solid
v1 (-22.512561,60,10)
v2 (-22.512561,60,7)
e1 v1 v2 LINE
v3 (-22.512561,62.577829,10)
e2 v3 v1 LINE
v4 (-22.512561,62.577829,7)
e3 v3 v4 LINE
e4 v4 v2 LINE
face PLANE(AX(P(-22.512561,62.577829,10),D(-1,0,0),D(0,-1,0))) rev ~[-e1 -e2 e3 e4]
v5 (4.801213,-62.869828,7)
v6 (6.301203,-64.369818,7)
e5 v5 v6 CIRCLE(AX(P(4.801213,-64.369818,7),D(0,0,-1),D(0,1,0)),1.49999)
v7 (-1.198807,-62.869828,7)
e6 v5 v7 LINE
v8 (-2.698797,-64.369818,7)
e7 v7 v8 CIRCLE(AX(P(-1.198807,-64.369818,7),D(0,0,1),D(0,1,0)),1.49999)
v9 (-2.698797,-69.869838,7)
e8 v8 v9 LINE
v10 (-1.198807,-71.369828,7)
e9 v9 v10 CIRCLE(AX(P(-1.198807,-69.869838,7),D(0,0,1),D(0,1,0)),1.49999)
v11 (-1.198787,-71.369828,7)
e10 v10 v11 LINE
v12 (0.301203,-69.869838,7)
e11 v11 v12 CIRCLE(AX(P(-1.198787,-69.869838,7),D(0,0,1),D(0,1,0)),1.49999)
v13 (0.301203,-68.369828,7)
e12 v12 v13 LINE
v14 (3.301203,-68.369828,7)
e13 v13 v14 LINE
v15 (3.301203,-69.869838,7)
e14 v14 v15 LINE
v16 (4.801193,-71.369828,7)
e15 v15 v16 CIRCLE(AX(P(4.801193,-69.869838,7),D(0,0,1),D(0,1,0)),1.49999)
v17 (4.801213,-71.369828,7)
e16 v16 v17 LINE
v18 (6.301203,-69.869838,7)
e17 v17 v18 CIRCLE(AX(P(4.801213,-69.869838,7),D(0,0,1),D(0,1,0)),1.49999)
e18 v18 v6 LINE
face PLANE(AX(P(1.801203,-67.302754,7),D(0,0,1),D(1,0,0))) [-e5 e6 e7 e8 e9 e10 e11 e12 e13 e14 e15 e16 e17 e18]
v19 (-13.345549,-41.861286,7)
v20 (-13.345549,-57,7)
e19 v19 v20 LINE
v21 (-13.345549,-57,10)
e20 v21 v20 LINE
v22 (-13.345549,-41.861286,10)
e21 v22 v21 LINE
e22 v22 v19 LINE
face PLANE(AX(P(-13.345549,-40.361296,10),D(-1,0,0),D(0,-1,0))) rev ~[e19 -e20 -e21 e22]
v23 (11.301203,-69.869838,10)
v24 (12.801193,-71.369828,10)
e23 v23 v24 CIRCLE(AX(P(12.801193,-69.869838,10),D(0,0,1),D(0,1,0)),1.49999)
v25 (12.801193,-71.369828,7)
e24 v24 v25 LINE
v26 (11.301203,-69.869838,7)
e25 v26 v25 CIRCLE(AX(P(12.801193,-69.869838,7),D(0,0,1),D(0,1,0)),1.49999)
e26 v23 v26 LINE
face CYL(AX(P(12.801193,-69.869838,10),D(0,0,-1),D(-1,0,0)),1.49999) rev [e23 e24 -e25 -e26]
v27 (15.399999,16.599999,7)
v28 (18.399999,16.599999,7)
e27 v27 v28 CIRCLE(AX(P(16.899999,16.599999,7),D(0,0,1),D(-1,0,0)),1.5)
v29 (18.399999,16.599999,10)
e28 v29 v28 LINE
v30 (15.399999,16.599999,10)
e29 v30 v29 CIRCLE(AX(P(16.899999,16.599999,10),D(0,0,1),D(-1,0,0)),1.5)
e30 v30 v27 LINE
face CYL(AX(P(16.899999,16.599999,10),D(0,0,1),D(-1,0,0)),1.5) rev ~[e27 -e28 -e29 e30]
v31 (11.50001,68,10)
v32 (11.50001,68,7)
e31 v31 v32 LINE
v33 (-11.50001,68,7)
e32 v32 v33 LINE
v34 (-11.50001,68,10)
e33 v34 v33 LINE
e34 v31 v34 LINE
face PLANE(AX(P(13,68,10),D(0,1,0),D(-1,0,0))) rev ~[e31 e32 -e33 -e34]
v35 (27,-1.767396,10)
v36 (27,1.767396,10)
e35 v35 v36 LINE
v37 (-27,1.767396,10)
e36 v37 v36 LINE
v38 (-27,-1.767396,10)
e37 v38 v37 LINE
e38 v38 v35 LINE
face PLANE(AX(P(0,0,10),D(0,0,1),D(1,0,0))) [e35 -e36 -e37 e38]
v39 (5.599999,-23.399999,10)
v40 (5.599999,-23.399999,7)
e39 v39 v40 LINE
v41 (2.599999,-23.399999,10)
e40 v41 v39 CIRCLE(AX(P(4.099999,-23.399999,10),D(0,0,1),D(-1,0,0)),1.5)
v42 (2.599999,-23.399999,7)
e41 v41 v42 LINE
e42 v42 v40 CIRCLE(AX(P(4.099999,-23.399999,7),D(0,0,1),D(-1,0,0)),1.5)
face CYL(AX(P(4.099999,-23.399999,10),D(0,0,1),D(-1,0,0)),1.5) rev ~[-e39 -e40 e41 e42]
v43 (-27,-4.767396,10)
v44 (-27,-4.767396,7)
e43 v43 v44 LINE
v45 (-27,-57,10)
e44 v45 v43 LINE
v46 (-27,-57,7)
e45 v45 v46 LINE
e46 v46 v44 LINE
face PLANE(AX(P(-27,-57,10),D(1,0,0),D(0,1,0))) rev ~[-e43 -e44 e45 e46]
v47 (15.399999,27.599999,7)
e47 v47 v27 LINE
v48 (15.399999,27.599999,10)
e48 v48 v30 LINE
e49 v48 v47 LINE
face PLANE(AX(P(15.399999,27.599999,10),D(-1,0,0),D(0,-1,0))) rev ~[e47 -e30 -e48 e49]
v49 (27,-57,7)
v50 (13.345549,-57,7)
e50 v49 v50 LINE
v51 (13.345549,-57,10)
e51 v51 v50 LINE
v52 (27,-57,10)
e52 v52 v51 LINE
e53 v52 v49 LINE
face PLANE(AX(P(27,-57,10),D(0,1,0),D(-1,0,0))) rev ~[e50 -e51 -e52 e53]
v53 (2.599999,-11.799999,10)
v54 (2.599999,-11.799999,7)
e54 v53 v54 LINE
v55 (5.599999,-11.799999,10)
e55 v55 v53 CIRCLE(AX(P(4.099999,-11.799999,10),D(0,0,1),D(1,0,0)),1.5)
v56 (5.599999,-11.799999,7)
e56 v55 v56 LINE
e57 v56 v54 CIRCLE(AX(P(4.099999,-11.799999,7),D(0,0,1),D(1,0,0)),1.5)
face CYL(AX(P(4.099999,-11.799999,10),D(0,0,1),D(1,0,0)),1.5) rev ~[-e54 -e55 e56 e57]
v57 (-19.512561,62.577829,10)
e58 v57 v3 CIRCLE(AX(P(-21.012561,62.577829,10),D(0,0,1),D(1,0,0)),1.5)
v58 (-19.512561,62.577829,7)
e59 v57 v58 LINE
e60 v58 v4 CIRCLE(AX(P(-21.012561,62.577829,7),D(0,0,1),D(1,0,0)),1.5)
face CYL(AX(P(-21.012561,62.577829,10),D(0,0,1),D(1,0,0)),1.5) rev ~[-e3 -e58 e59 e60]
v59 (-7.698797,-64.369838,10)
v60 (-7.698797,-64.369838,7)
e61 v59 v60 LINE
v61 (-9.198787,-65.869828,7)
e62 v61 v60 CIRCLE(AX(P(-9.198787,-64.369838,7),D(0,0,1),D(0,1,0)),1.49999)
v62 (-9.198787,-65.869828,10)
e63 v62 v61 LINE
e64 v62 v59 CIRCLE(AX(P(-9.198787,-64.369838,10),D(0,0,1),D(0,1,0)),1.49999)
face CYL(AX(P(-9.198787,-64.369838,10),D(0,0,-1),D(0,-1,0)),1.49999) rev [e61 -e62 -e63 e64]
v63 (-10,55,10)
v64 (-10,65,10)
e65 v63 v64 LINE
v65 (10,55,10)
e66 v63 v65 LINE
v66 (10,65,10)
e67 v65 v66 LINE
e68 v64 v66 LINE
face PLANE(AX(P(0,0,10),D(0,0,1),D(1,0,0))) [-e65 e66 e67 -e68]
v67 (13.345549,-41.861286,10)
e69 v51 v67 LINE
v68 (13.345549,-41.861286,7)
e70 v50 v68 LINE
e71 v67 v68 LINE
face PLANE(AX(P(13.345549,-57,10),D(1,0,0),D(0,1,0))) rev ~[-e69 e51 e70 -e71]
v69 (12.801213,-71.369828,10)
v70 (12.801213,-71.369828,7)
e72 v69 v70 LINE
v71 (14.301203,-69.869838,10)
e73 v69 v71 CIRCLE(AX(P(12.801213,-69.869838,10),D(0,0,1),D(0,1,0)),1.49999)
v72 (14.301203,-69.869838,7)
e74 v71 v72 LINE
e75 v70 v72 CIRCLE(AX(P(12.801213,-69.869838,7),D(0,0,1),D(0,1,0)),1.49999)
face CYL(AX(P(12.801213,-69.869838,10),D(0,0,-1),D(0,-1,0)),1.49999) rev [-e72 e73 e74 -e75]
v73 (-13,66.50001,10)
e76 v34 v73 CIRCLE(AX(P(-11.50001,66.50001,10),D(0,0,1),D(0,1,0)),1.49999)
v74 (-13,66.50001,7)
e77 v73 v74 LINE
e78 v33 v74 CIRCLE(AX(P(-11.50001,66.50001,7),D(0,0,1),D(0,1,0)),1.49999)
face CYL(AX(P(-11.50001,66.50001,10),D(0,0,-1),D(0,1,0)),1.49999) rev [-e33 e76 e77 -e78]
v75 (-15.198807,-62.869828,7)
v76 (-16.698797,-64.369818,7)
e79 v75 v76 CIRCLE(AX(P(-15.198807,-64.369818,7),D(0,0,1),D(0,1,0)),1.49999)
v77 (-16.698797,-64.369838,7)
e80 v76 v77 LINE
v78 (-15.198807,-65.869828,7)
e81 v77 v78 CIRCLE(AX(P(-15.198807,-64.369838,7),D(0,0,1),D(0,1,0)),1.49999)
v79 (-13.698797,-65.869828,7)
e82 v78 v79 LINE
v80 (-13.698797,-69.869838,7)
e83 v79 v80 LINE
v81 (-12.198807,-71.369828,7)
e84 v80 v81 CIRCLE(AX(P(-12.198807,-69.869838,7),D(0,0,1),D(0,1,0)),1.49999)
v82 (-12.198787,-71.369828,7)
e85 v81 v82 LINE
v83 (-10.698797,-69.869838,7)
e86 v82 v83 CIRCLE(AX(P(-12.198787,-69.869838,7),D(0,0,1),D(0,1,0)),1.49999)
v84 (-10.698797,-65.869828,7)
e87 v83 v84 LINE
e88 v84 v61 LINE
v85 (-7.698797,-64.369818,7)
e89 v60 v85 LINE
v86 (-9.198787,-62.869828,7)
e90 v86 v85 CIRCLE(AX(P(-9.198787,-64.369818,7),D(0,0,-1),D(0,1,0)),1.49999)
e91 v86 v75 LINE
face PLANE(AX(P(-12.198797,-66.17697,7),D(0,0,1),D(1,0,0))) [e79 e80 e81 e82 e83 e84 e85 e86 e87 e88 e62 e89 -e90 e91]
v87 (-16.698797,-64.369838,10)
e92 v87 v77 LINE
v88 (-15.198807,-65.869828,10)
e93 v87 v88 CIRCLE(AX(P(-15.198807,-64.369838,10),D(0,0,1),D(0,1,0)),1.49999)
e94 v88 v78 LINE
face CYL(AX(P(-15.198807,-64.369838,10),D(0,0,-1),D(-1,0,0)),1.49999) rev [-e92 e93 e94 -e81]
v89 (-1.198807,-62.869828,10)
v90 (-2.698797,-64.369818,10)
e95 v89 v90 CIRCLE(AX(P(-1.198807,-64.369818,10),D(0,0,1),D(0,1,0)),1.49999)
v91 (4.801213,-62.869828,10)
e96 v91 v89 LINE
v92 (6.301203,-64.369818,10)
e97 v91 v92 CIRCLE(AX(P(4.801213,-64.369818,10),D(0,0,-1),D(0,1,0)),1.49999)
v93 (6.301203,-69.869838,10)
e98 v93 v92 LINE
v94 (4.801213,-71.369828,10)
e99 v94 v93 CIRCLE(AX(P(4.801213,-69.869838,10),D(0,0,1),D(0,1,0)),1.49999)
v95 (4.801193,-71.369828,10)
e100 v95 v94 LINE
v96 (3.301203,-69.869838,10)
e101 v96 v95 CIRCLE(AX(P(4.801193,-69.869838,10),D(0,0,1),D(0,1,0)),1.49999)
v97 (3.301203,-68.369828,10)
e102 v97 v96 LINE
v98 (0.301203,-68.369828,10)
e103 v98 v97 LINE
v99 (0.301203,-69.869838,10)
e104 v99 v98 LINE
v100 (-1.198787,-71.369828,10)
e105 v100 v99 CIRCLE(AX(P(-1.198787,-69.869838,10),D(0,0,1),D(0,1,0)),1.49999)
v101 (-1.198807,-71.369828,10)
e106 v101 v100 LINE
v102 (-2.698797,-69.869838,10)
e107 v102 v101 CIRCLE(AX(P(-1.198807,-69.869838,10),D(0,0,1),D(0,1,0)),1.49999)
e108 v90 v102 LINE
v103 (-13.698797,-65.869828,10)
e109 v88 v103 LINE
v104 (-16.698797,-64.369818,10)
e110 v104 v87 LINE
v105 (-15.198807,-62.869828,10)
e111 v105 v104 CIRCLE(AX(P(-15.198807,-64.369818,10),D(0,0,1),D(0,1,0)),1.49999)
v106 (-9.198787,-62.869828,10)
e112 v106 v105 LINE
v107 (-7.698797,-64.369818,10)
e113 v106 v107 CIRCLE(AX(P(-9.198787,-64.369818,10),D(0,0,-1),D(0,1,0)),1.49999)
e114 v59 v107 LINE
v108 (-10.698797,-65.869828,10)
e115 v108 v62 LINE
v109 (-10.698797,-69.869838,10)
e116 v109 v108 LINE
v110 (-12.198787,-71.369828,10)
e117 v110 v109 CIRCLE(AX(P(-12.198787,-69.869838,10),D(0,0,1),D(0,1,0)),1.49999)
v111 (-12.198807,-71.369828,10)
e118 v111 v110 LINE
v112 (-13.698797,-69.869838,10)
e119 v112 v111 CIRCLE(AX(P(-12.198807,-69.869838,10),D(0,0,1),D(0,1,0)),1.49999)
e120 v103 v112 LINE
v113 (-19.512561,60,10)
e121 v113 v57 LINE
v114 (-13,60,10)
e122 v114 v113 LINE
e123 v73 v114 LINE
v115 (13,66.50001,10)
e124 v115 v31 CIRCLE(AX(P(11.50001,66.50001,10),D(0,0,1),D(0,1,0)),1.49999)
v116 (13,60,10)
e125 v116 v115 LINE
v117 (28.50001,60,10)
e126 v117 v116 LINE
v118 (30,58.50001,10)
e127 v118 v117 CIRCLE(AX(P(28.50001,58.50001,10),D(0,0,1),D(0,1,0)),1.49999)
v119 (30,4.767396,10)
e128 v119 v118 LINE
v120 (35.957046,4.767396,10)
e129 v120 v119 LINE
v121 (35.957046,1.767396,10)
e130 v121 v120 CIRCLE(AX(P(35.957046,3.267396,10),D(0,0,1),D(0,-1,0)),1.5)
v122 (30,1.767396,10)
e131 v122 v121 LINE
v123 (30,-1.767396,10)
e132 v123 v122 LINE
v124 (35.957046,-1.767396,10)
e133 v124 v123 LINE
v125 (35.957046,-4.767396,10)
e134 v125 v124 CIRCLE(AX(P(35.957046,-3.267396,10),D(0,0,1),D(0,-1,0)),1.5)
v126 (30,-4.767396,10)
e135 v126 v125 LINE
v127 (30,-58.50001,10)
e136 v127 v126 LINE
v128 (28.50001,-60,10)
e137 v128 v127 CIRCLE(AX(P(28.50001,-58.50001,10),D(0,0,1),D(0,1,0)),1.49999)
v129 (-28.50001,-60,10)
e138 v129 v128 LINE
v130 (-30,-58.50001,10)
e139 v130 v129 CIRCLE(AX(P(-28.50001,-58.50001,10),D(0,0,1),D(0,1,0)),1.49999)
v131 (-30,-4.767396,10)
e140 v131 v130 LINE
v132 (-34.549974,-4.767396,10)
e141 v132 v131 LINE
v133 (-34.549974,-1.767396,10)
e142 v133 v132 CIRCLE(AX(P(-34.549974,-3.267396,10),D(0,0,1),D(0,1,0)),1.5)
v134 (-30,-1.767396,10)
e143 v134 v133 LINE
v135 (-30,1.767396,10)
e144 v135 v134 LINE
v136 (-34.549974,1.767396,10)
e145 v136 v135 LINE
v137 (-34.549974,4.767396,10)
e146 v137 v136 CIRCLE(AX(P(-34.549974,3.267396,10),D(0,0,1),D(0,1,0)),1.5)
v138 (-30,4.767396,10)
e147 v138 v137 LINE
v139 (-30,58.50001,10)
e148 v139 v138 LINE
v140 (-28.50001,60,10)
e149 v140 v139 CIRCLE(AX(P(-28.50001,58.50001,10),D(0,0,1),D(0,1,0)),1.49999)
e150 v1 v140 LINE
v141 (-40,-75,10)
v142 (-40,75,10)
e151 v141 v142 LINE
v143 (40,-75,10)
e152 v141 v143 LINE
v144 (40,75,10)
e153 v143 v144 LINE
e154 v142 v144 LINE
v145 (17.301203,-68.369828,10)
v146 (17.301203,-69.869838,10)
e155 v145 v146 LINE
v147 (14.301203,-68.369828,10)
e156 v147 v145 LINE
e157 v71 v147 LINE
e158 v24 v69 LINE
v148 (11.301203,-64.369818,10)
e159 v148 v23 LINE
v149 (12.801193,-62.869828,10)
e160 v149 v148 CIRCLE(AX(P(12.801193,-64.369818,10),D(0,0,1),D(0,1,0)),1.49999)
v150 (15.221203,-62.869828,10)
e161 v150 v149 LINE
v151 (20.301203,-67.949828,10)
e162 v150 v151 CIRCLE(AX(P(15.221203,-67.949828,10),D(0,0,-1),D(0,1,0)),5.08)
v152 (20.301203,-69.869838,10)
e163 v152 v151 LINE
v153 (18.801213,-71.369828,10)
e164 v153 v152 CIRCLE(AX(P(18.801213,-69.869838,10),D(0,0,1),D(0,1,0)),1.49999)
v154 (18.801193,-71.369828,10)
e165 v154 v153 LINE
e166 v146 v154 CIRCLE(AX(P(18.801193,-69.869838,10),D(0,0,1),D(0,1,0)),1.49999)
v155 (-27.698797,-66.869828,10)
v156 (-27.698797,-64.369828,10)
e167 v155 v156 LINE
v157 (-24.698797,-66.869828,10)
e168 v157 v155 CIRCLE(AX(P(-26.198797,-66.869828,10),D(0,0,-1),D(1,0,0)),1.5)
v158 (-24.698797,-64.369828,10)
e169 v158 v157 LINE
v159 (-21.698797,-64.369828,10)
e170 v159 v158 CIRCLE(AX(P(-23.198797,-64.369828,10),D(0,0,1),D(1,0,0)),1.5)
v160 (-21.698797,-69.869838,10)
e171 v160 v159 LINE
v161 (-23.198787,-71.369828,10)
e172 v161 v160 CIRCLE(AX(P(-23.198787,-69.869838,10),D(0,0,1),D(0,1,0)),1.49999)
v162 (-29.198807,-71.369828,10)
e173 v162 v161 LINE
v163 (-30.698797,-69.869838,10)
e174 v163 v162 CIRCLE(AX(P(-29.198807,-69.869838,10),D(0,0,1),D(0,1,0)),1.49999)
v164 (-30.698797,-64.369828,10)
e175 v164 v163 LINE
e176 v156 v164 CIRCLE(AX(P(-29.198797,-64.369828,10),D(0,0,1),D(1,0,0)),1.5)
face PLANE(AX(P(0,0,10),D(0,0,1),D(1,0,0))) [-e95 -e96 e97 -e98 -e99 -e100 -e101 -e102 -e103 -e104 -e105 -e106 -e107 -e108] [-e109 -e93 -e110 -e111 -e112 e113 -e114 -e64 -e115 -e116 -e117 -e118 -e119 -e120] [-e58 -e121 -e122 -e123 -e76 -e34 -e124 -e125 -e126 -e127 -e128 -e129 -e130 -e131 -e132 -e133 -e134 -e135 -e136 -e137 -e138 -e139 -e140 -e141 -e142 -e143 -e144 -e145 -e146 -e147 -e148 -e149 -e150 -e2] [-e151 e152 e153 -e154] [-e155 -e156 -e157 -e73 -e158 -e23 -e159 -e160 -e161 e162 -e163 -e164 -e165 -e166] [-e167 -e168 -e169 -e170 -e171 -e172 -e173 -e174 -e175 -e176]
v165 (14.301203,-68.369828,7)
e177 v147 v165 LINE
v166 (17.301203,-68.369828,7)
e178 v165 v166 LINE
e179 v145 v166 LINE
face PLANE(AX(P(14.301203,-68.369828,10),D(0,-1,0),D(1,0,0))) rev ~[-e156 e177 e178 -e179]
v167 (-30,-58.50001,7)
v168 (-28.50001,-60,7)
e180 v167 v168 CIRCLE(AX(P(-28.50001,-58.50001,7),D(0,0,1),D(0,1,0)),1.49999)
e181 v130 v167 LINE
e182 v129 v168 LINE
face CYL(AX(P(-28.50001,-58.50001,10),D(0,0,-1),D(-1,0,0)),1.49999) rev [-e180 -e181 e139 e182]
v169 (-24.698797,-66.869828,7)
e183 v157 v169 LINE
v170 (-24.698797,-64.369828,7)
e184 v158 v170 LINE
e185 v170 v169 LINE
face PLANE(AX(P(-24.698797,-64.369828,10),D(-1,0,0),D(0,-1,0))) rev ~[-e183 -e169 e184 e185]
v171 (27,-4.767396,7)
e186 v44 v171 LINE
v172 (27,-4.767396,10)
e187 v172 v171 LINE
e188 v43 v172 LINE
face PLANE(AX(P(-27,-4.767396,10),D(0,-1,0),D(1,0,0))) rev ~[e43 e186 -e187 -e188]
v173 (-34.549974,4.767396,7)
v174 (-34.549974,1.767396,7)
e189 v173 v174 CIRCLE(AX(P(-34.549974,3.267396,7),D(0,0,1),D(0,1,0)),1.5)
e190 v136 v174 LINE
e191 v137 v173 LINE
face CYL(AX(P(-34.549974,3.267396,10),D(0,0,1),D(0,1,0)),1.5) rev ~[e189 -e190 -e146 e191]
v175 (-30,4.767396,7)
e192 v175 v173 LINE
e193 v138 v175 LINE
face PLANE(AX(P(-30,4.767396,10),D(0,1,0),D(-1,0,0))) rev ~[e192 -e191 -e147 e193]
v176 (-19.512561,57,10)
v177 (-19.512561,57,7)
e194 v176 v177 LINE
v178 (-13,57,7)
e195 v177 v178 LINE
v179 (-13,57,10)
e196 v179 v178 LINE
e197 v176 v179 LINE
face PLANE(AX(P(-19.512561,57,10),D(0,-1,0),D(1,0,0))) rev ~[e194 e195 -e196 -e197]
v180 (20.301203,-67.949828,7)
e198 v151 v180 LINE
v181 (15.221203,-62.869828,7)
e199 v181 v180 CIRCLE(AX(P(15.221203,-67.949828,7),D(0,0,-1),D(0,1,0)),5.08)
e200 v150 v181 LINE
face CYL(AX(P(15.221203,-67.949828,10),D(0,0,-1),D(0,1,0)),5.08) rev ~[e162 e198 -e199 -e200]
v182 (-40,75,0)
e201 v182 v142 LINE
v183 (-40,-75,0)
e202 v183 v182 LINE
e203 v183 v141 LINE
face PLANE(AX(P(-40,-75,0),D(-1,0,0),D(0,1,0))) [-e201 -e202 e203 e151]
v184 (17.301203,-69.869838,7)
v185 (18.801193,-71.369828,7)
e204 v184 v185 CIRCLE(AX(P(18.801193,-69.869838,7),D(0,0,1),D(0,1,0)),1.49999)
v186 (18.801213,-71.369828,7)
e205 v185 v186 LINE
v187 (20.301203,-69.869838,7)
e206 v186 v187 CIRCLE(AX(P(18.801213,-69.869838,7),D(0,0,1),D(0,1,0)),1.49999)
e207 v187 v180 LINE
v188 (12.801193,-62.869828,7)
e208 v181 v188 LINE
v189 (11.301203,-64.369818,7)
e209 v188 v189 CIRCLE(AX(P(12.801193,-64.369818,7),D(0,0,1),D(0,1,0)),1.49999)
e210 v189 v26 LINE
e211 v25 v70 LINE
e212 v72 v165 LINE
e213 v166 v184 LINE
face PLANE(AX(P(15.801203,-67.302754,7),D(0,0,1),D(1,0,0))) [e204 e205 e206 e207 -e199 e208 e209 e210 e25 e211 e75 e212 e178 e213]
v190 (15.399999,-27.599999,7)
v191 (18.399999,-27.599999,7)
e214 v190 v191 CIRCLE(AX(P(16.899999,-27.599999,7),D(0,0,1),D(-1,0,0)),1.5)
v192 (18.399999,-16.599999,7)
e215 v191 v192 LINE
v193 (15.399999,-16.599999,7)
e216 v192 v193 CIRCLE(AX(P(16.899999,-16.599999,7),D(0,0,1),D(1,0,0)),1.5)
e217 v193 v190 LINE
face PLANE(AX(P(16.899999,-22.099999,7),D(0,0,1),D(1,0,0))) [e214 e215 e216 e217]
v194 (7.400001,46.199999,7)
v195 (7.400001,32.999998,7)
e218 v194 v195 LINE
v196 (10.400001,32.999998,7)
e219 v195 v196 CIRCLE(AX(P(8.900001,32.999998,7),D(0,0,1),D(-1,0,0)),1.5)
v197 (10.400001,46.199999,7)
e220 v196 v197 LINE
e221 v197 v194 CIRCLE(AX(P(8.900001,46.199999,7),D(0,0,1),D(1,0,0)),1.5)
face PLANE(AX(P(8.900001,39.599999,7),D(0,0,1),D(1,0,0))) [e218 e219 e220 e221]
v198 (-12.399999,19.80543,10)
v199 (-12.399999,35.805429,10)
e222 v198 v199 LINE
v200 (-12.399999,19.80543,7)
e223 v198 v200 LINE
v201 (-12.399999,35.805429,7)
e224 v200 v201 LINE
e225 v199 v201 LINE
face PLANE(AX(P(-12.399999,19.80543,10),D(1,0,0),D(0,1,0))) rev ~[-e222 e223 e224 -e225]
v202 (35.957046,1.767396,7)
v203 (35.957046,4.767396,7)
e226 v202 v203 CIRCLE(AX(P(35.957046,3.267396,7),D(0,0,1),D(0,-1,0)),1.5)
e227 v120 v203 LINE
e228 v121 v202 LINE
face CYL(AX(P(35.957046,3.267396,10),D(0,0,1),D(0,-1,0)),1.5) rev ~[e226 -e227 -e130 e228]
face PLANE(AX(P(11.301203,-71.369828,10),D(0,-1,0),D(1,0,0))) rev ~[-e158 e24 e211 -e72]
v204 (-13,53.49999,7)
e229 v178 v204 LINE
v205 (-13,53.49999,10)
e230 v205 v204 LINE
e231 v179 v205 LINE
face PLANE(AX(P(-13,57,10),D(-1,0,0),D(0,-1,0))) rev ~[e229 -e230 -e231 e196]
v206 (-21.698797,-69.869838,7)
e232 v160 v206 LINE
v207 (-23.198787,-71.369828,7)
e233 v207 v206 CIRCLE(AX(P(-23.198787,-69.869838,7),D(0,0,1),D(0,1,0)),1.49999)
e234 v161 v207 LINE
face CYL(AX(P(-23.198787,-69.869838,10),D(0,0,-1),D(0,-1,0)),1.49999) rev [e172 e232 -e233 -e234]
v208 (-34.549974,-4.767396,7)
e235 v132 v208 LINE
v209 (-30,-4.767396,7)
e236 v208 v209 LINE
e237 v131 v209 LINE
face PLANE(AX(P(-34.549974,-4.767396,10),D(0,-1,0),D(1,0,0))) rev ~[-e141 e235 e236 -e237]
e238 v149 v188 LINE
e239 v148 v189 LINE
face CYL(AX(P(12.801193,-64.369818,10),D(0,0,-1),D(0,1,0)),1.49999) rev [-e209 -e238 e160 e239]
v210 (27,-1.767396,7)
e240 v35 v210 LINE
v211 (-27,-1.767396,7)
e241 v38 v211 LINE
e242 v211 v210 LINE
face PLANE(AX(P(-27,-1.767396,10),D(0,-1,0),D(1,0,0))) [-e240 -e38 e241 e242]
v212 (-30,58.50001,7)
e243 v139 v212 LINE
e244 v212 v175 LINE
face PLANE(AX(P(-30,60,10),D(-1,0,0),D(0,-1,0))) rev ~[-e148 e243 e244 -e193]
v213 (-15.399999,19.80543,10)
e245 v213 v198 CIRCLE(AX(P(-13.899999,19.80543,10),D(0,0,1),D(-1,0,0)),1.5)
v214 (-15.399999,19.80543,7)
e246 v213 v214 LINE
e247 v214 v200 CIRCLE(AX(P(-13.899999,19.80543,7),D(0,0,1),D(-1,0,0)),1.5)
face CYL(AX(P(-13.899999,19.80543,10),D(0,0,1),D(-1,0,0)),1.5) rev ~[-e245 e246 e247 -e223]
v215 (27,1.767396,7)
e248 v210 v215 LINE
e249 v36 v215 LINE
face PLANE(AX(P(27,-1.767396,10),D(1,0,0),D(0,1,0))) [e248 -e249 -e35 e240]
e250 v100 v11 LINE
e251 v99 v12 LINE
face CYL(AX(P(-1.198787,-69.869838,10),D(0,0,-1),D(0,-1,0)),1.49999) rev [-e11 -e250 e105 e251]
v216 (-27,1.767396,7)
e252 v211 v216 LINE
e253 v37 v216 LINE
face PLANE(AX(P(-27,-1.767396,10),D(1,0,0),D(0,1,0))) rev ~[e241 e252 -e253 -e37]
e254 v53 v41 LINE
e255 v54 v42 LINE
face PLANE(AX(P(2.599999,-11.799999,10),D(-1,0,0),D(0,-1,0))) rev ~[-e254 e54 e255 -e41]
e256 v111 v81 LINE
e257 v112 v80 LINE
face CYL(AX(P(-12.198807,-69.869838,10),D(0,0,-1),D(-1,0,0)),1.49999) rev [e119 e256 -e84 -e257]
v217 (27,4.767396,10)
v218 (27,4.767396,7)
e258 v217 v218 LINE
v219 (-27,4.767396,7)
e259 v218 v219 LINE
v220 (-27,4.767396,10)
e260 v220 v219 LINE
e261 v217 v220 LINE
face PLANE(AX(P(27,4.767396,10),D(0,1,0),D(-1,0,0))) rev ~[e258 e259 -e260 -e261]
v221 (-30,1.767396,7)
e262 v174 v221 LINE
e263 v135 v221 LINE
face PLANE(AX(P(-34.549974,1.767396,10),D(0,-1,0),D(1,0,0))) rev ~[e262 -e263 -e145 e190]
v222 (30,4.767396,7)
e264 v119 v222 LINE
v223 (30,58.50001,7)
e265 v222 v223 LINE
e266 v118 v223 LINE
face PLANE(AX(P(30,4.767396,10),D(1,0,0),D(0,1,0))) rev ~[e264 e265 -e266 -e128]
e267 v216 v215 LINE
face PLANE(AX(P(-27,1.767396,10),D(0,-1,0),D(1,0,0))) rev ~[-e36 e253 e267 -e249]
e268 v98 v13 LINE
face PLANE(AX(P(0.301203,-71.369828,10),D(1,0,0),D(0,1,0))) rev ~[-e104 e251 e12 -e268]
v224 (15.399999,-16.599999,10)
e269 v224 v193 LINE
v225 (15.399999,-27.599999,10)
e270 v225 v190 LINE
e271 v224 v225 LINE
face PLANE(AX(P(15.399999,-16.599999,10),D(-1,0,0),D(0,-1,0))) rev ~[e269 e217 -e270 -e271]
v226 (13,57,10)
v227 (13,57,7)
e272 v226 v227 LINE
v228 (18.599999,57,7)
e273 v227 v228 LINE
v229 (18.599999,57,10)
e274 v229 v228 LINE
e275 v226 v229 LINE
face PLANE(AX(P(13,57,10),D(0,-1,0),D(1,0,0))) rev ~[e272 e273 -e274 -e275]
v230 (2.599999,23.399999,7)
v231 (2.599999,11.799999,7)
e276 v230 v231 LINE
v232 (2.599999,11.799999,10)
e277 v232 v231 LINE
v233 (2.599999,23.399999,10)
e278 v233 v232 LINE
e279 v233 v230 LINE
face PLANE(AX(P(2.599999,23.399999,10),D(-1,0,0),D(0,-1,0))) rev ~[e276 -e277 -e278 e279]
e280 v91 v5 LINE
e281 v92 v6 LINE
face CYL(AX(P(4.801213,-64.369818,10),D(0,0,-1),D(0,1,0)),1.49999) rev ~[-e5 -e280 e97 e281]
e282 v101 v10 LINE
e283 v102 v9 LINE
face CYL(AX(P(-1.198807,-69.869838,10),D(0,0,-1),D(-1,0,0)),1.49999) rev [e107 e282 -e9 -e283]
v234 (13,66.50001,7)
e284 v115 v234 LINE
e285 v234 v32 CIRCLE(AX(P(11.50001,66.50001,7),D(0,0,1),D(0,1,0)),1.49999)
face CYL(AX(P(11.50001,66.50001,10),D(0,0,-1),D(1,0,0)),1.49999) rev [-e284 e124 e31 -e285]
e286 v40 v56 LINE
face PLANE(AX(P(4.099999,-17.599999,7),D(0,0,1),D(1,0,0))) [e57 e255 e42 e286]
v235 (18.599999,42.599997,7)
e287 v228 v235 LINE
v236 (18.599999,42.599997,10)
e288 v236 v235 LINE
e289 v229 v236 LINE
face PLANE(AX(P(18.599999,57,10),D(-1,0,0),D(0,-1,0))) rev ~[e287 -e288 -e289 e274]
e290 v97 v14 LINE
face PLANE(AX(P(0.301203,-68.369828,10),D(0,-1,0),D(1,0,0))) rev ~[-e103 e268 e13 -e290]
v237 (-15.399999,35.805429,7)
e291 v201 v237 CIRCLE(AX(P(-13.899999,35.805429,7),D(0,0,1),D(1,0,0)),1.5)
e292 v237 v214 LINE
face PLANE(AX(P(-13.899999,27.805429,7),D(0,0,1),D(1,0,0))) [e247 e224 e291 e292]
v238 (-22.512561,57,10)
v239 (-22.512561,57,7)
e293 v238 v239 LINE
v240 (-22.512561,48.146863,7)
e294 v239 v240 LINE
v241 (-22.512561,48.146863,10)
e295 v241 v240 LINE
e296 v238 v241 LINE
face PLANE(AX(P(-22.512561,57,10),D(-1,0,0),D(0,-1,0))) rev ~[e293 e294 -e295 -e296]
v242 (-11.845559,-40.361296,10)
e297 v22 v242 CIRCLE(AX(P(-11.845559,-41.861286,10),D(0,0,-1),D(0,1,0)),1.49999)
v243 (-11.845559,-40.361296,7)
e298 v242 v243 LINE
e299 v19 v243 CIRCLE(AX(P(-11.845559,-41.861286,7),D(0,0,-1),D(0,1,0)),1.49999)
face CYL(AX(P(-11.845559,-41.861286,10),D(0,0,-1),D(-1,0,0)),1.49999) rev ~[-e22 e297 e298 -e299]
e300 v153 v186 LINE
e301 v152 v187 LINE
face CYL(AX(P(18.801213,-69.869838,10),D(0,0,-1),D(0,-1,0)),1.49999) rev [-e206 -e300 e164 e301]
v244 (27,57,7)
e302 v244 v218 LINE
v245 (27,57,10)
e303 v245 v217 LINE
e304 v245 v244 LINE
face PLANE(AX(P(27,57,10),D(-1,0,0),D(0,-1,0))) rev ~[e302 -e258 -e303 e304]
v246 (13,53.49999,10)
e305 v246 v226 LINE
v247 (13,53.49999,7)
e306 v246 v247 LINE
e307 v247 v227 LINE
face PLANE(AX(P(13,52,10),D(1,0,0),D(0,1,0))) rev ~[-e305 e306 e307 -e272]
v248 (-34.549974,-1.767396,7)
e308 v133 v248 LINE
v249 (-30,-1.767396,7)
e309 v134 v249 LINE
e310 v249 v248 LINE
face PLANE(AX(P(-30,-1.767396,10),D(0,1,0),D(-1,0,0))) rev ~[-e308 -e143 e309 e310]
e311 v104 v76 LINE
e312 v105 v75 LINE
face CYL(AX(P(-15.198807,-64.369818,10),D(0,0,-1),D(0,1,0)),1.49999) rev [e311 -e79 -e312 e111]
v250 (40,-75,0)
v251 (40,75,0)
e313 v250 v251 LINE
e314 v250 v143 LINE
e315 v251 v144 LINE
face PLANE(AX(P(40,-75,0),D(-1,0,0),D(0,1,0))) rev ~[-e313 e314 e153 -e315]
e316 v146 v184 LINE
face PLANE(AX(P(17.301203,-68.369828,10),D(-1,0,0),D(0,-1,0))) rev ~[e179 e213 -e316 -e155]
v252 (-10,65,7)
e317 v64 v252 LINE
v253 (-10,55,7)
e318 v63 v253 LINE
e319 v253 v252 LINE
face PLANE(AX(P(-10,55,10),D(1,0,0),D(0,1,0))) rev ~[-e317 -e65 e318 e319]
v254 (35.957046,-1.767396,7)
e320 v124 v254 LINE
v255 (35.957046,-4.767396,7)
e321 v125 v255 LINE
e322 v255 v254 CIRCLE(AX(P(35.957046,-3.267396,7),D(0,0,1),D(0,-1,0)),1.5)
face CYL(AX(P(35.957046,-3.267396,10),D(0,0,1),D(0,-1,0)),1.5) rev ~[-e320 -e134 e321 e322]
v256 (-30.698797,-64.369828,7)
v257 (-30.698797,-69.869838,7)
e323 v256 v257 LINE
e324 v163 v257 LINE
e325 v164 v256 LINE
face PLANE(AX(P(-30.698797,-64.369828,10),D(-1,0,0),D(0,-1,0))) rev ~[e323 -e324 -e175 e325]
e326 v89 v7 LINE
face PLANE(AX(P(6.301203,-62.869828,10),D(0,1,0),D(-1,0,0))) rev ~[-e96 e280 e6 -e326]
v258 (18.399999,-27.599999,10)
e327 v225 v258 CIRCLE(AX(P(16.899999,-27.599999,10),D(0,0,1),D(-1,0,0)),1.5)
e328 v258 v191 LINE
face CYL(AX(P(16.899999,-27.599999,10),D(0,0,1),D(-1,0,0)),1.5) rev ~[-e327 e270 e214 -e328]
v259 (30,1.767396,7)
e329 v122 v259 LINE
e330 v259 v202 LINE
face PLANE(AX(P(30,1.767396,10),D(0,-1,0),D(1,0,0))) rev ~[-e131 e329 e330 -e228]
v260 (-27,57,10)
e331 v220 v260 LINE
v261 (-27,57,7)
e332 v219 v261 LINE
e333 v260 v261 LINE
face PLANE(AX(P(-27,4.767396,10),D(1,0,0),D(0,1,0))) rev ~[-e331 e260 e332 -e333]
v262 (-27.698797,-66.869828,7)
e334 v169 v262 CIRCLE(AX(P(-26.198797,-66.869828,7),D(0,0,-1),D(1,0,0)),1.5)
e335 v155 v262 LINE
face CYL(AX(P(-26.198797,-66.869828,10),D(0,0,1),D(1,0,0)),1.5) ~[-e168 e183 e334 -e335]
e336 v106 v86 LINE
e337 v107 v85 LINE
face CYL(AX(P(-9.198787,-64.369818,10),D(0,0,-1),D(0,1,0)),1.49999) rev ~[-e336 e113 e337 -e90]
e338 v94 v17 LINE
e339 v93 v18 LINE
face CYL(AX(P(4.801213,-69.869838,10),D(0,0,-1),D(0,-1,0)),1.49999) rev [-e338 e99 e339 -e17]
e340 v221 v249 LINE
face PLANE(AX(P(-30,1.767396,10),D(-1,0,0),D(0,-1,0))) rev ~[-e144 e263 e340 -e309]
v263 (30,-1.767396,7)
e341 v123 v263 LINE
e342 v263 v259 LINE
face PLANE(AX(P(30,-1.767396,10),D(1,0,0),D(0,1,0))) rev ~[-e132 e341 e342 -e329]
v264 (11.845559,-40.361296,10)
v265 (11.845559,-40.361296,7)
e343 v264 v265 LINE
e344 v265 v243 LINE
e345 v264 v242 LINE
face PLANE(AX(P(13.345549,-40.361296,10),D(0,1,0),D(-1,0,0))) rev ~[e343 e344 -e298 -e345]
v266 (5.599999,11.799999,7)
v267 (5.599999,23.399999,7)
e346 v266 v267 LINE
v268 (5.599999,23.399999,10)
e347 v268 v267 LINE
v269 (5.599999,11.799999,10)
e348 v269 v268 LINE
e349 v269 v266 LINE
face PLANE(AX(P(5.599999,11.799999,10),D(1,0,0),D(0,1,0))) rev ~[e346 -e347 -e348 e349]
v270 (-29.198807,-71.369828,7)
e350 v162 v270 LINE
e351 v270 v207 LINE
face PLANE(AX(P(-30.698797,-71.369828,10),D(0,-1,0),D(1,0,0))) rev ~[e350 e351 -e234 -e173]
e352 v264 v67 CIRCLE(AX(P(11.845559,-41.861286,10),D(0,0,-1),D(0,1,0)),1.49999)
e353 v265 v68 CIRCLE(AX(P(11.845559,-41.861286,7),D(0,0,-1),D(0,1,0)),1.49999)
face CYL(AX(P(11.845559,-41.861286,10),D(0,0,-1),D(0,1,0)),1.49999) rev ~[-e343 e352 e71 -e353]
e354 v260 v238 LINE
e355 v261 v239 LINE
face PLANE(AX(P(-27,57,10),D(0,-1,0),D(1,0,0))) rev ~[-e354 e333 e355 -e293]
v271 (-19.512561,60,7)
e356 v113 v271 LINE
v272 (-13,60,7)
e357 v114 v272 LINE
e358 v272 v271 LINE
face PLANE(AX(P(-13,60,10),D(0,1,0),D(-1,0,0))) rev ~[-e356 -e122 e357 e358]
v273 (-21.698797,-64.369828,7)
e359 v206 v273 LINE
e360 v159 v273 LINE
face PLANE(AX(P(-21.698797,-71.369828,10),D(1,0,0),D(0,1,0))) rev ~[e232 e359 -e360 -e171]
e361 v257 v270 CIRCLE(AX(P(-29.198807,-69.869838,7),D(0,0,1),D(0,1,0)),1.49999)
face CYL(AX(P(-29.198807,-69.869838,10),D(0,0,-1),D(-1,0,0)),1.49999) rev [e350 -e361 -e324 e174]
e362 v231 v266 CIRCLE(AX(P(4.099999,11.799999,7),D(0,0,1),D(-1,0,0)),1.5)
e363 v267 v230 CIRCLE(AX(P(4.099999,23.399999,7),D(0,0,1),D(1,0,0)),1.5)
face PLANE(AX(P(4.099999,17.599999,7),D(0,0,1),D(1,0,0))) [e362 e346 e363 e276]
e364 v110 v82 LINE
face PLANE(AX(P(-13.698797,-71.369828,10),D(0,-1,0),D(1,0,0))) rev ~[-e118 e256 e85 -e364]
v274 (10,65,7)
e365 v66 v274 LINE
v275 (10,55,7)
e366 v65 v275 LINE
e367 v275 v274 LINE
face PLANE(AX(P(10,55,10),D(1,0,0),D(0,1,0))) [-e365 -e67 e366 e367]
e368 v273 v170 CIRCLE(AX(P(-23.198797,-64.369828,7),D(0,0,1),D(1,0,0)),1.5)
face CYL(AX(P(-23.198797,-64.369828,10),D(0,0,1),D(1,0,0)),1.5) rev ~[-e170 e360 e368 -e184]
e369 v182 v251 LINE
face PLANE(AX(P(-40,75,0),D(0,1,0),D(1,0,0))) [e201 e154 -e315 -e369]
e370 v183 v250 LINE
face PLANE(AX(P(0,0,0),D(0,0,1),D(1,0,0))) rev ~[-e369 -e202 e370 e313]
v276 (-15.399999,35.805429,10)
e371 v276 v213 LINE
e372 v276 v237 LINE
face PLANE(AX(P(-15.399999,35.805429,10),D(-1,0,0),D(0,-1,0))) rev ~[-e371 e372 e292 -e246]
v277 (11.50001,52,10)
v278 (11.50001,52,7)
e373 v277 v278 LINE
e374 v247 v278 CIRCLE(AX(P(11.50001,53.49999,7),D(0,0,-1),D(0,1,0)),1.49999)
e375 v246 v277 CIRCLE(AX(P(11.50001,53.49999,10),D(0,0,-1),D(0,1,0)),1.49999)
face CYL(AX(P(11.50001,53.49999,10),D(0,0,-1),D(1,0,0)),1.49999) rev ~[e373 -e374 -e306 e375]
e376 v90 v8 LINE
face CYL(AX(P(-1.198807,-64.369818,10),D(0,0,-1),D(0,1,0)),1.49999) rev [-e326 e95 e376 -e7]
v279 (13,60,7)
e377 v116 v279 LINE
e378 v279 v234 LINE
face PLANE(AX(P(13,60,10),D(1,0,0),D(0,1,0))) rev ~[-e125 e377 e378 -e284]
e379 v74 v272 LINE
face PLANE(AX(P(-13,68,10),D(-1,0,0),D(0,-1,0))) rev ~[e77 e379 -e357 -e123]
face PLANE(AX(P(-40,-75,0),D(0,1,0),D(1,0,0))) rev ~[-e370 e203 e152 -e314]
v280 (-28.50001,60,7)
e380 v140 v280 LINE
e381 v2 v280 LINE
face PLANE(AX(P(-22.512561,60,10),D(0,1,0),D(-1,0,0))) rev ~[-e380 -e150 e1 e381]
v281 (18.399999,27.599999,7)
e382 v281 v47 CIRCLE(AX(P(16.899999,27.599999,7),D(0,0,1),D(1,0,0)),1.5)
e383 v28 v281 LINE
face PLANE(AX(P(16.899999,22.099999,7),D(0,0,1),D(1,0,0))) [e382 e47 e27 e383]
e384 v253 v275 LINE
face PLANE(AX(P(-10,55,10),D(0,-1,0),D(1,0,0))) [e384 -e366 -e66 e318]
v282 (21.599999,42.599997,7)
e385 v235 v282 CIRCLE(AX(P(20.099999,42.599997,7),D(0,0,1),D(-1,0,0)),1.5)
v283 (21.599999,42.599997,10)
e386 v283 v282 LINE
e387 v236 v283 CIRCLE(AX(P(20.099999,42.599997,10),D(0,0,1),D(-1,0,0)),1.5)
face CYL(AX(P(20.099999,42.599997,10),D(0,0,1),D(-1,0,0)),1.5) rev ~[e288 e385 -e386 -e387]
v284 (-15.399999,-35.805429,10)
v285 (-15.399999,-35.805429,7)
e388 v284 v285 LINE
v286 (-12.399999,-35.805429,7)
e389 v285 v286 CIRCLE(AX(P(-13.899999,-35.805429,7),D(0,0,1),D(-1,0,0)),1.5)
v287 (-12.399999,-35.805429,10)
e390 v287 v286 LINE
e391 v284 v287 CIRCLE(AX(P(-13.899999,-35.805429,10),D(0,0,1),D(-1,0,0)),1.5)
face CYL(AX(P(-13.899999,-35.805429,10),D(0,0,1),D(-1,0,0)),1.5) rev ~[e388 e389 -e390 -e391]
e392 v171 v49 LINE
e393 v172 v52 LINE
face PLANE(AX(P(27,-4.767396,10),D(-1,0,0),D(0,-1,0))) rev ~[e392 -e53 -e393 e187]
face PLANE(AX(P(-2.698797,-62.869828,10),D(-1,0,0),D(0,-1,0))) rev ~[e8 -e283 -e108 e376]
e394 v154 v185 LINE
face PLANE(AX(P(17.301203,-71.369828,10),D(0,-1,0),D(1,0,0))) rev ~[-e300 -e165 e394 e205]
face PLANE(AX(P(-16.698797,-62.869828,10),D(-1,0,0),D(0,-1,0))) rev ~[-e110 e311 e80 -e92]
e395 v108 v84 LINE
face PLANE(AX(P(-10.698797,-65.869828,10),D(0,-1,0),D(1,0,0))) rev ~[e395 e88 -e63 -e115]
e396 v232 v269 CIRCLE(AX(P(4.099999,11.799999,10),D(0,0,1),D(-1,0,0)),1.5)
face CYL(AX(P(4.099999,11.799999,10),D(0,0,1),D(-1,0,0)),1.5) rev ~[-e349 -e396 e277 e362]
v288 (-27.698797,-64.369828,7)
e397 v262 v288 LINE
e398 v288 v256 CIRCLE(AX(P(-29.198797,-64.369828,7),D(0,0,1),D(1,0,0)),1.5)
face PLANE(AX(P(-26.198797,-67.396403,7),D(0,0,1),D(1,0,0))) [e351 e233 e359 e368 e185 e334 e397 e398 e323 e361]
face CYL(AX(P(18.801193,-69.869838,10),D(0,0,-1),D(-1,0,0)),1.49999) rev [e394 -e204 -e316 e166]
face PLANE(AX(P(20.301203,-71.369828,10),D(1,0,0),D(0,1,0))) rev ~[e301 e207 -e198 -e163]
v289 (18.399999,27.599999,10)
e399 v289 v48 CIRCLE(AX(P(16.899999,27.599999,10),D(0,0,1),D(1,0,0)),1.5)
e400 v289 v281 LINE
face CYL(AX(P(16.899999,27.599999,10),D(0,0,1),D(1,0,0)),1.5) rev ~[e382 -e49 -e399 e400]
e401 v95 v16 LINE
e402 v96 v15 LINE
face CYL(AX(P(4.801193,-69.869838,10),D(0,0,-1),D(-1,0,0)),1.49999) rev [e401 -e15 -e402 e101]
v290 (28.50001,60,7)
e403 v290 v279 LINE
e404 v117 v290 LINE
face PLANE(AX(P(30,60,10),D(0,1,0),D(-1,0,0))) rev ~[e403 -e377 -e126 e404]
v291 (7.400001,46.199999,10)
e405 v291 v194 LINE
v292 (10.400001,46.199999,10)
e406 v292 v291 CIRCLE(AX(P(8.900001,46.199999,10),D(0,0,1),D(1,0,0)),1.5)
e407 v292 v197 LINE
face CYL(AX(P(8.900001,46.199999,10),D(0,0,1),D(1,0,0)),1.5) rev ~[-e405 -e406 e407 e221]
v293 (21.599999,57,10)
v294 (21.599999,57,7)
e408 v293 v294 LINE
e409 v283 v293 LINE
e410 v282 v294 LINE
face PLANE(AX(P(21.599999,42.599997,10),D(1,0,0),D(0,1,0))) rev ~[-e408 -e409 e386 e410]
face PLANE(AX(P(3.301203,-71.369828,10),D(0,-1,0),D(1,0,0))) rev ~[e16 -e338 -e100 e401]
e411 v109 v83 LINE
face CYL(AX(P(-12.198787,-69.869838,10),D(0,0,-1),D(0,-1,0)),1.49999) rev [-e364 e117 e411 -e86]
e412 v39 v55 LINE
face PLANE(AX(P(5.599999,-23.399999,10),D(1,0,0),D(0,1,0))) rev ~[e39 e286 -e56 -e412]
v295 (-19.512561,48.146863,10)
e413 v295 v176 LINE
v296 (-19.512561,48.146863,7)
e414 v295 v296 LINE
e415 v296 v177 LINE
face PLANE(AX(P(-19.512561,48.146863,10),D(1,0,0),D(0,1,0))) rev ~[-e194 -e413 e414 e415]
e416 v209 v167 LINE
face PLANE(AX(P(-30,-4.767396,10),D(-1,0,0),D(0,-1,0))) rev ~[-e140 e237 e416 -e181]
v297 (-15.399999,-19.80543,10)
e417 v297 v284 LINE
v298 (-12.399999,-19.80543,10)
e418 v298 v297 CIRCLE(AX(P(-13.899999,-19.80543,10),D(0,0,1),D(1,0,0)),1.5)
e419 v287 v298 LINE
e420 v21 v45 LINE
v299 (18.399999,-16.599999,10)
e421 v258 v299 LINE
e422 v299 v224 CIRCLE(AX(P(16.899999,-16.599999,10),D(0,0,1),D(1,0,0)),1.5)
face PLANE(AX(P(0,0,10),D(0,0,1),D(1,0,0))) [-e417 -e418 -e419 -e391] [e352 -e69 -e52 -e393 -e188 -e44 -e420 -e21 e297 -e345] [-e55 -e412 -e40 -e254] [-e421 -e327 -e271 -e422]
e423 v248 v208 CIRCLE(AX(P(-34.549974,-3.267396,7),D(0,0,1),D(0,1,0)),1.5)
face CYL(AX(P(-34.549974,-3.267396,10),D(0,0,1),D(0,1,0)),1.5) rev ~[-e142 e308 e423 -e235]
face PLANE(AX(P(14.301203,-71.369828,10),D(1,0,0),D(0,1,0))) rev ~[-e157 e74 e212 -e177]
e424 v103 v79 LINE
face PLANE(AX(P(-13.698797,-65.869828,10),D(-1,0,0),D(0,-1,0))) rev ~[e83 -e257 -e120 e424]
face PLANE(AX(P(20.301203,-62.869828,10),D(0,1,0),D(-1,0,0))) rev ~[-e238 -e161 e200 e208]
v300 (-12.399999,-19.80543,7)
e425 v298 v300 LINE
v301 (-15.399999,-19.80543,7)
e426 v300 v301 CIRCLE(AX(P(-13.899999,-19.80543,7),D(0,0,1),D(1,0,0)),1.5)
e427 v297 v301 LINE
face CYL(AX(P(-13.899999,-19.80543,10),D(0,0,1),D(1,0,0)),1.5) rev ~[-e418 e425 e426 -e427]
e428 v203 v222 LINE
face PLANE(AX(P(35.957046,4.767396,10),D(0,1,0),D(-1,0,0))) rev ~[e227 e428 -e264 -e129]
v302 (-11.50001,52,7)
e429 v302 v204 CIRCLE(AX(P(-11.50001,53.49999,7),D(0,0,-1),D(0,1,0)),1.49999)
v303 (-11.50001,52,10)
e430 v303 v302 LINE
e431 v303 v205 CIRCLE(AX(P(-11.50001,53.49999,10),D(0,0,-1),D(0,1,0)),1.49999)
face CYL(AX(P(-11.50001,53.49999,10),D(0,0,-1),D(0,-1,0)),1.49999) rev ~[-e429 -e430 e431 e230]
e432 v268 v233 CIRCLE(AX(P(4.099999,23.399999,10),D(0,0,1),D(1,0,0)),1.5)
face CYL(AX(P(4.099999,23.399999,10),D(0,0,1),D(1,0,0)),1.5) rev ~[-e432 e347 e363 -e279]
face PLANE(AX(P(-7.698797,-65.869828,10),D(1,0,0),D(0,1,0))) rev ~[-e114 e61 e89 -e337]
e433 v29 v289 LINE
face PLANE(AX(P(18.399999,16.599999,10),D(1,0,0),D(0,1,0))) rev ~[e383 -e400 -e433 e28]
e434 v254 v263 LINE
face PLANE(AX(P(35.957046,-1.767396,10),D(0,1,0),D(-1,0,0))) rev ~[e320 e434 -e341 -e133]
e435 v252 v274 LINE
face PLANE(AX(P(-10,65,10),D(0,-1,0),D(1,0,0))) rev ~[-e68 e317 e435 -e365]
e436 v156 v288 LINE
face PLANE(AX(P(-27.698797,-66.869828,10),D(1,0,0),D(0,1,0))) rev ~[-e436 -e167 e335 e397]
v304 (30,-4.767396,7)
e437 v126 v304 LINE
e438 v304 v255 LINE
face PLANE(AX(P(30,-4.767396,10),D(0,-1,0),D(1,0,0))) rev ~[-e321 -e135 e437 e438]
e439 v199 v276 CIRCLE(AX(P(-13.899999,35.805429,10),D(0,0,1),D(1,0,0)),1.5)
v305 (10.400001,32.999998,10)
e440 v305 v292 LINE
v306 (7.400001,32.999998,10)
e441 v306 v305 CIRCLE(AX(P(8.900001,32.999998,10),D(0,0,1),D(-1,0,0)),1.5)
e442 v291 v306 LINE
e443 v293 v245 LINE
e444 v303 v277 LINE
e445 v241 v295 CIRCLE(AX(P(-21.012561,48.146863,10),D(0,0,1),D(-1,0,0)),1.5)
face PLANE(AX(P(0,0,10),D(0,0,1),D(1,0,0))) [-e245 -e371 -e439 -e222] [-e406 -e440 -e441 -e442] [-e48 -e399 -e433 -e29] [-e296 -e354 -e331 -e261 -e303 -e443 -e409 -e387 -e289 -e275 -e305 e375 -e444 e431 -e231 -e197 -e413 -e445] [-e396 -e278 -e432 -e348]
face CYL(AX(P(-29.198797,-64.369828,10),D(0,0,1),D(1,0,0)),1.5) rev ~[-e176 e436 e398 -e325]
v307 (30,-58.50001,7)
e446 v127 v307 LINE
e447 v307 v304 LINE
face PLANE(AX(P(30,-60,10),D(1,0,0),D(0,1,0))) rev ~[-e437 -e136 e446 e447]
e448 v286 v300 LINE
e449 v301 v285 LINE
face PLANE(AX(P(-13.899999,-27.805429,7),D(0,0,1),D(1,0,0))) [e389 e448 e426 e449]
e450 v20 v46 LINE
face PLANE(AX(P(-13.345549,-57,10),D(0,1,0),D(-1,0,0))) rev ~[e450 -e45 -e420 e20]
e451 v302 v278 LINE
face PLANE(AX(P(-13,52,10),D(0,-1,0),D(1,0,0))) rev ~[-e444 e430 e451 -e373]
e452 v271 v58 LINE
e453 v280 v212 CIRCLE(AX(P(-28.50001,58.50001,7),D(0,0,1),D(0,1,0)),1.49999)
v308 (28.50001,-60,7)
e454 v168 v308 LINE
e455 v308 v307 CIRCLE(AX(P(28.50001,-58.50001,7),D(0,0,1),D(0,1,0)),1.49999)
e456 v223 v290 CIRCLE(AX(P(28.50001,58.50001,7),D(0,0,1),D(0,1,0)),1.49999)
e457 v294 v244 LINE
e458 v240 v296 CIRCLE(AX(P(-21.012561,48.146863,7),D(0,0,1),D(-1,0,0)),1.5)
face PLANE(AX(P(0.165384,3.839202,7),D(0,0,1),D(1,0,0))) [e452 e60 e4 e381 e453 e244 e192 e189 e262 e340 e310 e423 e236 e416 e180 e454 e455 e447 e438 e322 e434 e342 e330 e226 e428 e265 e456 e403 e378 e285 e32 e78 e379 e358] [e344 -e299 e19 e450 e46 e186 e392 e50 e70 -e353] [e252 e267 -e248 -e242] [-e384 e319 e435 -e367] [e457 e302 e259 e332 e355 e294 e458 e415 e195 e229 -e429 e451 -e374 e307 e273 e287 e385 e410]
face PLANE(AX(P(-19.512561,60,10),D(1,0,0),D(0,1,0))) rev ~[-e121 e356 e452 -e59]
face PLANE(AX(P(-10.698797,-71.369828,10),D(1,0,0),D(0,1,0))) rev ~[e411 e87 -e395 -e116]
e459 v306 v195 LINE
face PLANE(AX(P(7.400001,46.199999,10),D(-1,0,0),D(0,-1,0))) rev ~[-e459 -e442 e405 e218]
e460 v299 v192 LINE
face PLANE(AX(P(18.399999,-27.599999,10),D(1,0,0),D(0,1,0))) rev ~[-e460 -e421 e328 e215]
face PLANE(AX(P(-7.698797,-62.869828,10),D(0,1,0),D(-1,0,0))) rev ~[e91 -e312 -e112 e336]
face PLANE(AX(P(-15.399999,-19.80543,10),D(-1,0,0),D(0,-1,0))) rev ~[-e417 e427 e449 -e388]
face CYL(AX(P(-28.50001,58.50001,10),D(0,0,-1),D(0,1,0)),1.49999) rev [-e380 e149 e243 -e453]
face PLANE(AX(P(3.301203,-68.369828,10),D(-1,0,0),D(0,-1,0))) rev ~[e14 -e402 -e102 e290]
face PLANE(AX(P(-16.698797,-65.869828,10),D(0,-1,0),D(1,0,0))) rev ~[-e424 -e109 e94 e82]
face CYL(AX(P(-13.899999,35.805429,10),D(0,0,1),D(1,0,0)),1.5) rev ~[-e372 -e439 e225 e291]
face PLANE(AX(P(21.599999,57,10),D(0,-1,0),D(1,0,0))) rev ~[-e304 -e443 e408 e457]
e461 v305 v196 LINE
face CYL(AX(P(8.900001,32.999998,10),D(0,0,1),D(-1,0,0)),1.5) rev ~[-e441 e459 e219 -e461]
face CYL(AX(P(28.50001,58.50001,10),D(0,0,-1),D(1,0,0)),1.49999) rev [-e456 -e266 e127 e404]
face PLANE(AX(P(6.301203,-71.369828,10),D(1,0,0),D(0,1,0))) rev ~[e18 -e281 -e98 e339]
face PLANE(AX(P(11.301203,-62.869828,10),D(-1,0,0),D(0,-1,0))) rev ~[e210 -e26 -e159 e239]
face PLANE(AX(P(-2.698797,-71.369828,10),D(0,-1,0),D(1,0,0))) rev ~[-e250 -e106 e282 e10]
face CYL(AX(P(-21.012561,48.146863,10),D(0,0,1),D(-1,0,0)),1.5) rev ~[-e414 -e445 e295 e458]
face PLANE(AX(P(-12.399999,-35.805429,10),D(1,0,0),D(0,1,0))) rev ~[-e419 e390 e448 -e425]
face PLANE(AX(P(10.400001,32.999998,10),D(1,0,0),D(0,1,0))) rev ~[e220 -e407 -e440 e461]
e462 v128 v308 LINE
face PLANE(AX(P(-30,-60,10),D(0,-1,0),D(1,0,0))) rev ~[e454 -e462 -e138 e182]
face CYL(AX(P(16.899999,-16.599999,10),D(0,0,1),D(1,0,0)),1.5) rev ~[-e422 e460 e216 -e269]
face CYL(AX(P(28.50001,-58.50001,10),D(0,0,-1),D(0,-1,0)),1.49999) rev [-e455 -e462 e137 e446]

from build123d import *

# Parameters (mm, degrees)
F0_W     = 80
F0_H     = 150
F1_DEPTH = 10
F2_W     = 54
F2_H     = 3.5347917583
F2_W_2   = 20
F2_H_2   = 10
F3_DEPTH = 3
F4_R     = 1.49999
F5_R     = 5.08


# Not quite as in the source:
# - a fillet or chamfer is up to 0.001 mm smaller than in the source, because OpenCascade refuses the exact size


with BuildPart() as f1:
    # F0 (on Top) → F1 (new body)
    with BuildSketch(Plane.XY):
        Rectangle(F0_W, F0_H)
    extrude(amount=F1_DEPTH)

    # F2 (on face) → F3 (cut)
    with BuildSketch(Plane.XY.offset(10)):
        with BuildLine():
            Line((30, 4.7673958791), (30, 60))
            Line((30, 60), (27, 60))
            Line((27, 60), (13, 60))
            Line((13, 60), (13, 65))
            Line((13, 65), (13, 68))
            Line((13, 68), (-13, 68))
            Line((-13, 68), (-13, 60))
            Line((-13, 60), (-19.5125607103, 60))
            Line((-19.5125607103, 60), (-19.5125607103, 62.5778287649))
            ThreePointArc((-19.5125607103, 62.5778287649), (-21.0125607103, 64.0778287649), (-22.5125607103, 62.5778287649))
            Line((-22.5125607103, 62.5778287649), (-22.5125607103, 60))
            Line((-22.5125607103, 60), (-30, 60))
            Line((-30, 60), (-30, 57))
            Line((-30, 57), (-30, 4.7673958791))
            Line((-30, 4.7673958791), (-34.5499739051, 4.7673958791))
            ThreePointArc((-34.5499739051, 4.7673958791), (-36.0499739051, 3.2673958791), (-34.5499739051, 1.7673958791))
            Line((-34.5499739051, 1.7673958791), (-30, 1.7673958791))
            Line((-30, 1.7673958791), (-30, -1.7673958791))
            Line((-30, -1.7673958791), (-34.5499739051, -1.7673958791))
            ThreePointArc((-34.5499739051, -1.7673958791), (-36.0499739051, -3.2673958791), (-34.5499739051, -4.7673958791))
            Line((-34.5499739051, -4.7673958791), (-30, -4.7673958791))
            Line((-30, -4.7673958791), (-30, -60))
            Line((-30, -60), (-27, -60))
            Line((-27, -60), (30, -60))
            Line((30, -60), (30, -57))
            Line((30, -57), (30, -4.7673958791))
            Line((30, -4.7673958791), (35.9570458531, -4.7673958791))
            ThreePointArc((35.9570458531, -4.7673958791), (37.4570458531, -3.2673958791), (35.9570458531, -1.7673958791))
            Line((35.9570458531, -1.7673958791), (30, -1.7673958791))
            Line((30, -1.7673958791), (30, 1.7673958791))
            Line((30, 1.7673958791), (35.9570458531, 1.7673958791))
            ThreePointArc((35.9570458531, 1.7673958791), (37.4570458531, 3.2673958791), (35.9570458531, 4.7673958791))
            Line((35.9570458531, 4.7673958791), (30, 4.7673958791))
        make_face()
        Polygon((-13.3455488831, -57), (-27, -57), (-27, -4.7673958791), (27, -4.7673958791), (27, -57), (13.3455488831, -57), (13.3455488831, -40.3612964153), (-13.3455488831, -40.3612964153), align=None, mode=Mode.SUBTRACT)
        Rectangle(F2_W, F2_H, mode=Mode.SUBTRACT)
        with BuildLine():
            Line((13, 57), (18.5999989513, 57))
            Line((18.5999989513, 57), (18.5999989513, 42.599997338))
            ThreePointArc((18.5999989513, 42.599997338), (20.0999989513, 41.099997338), (21.5999989513, 42.599997338))
            Line((21.5999989513, 42.599997338), (21.5999989513, 57))
            Line((21.5999989513, 57), (27, 57))
            Line((27, 57), (27, 4.7673958791))
            Line((27, 4.7673958791), (-27, 4.7673958791))
            Line((-27, 4.7673958791), (-27, 57))
            Line((-27, 57), (-22.5125607103, 57))
            Line((-22.5125607103, 57), (-22.5125607103, 48.1468625367))
            ThreePointArc((-22.5125607103, 48.1468625367), (-21.0125607103, 46.6468625367), (-19.5125607103, 48.1468625367))
            Line((-19.5125607103, 48.1468625367), (-19.5125607103, 57))
            Line((-19.5125607103, 57), (-13, 57))
            Line((-13, 57), (-13, 52))
            Line((-13, 52), (13, 52))
            Line((13, 52), (13, 57))
        make_face(mode=Mode.SUBTRACT)
        with Locations((0, 60)):
            Rectangle(F2_W_2, F2_H_2, mode=Mode.SUBTRACT)
        with BuildLine():
            ThreePointArc((-27.6987971216, -64.3698275089), (-29.1987971216, -62.8698275089), (-30.6987971216, -64.3698275089))
            Line((-30.6987971216, -64.3698275089), (-30.6987971216, -71.3698275089))
            Line((-30.6987971216, -71.3698275089), (-21.6987971216, -71.3698275089))
            Line((-21.6987971216, -71.3698275089), (-21.6987971216, -64.3698275089))
            ThreePointArc((-21.6987971216, -64.3698275089), (-23.1987971216, -62.8698275089), (-24.6987971216, -64.3698275089))
            Line((-24.6987971216, -64.3698275089), (-24.6987971216, -66.8698275089))
            ThreePointArc((-24.6987971216, -66.8698275089), (-26.1987971216, -68.3698275089), (-27.6987971216, -66.8698275089))
            Line((-27.6987971216, -66.8698275089), (-27.6987971216, -64.3698275089))
        make_face()
        Polygon((-7.6987971216, -62.8698275089), (-16.6987971216, -62.8698275089), (-16.6987971216, -65.8698275089), (-13.6987971216, -65.8698275089), (-13.6987971216, -71.3698275089), (-10.6987971216, -71.3698275089), (-10.6987971216, -65.8698275089), (-7.6987971216, -65.8698275089), align=None)
        Polygon((6.3012028784, -62.8698275089), (-2.6987971216, -62.8698275089), (-2.6987971216, -71.3698275089), (0.3012028784, -71.3698275089), (0.3012028784, -68.3698275089), (3.3012028784, -68.3698275089), (3.3012028784, -71.3698275089), (6.3012028784, -71.3698275089), align=None)
        Polygon((20.3012028784, -62.8698275089), (11.3012028784, -62.8698275089), (11.3012028784, -71.3698275089), (14.3012028784, -71.3698275089), (14.3012028784, -68.3698275089), (17.3012028784, -68.3698275089), (17.3012028784, -71.3698275089), (20.3012028784, -71.3698275089), align=None)
        with BuildLine():
            ThreePointArc((-12.3999991665, 35.8054286294), (-13.8999991665, 37.3054286294), (-15.3999991665, 35.8054286294))
            Line((-15.3999991665, 35.8054286294), (-15.3999991665, 19.805429705))
            ThreePointArc((-15.3999991665, 19.805429705), (-13.8999991665, 18.305429705), (-12.3999991665, 19.805429705))
            Line((-12.3999991665, 19.805429705), (-12.3999991665, 35.8054286294))
        make_face()
        with BuildLine():
            ThreePointArc((10.4000005109, 46.1999991127), (8.9000005109, 47.6999991127), (7.4000005109, 46.1999991127))
            Line((7.4000005109, 46.1999991127), (7.4000005109, 32.9999979834))
            ThreePointArc((7.4000005109, 32.9999979834), (8.9000005109, 31.4999979834), (10.4000005109, 32.9999979834))
            Line((10.4000005109, 32.9999979834), (10.4000005109, 46.1999991127))
        make_face()
        with BuildLine():
            ThreePointArc((5.5999992202, 23.3999986287), (4.0999992202, 24.8999986287), (2.5999992202, 23.3999986287))
            Line((2.5999992202, 23.3999986287), (2.5999992202, 11.7999990051))
            ThreePointArc((2.5999992202, 11.7999990051), (4.0999992202, 10.2999990051), (5.5999992202, 11.7999990051))
            Line((5.5999992202, 11.7999990051), (5.5999992202, 23.3999986287))
        make_face()
        with BuildLine():
            ThreePointArc((18.3999991665, 27.599998548), (16.8999991665, 29.099998548), (15.3999991665, 27.599998548))
            Line((15.3999991665, 27.599998548), (15.3999991665, 16.5999986825))
            ThreePointArc((15.3999991665, 16.5999986825), (16.8999991665, 15.0999986825), (18.3999991665, 16.5999986825))
            Line((18.3999991665, 16.5999986825), (18.3999991665, 27.599998548))
        make_face()
        with BuildLine():
            Line((-12.3999991665, -35.8054286294), (-12.3999991665, -19.805429705))
            ThreePointArc((-12.3999991665, -19.805429705), (-13.8999991665, -18.305429705), (-15.3999991665, -19.805429705))
            Line((-15.3999991665, -19.805429705), (-15.3999991665, -35.8054286294))
            ThreePointArc((-15.3999991665, -35.8054286294), (-13.8999991665, -37.3054286294), (-12.3999991665, -35.8054286294))
        make_face()
        with BuildLine():
            ThreePointArc((5.5999992202, -11.7999990051), (4.0999992202, -10.2999990051), (2.5999992202, -11.7999990051))
            Line((2.5999992202, -11.7999990051), (2.5999992202, -23.3999986287))
            ThreePointArc((2.5999992202, -23.3999986287), (4.0999992202, -24.8999986287), (5.5999992202, -23.3999986287))
            Line((5.5999992202, -23.3999986287), (5.5999992202, -11.7999990051))
        make_face()
        with BuildLine():
            ThreePointArc((18.3999991665, -16.5999986825), (16.8999991665, -15.0999986825), (15.3999991665, -16.5999986825))
            Line((15.3999991665, -16.5999986825), (15.3999991665, -27.599998548))
            ThreePointArc((15.3999991665, -27.599998548), (16.8999991665, -29.099998548), (18.3999991665, -27.599998548))
            Line((18.3999991665, -27.599998548), (18.3999991665, -16.5999986825))
        make_face()
    extrude(amount=-F3_DEPTH, mode=Mode.SUBTRACT)

    # F4 (radius 1.5 in the source; OpenCascade refuses exactly that, so slightly less here)
    f4_edges = [f1.edges().sort_by_distance(p)[0] for p in [
        (-13, 52, 8.5),
        (-13, 68, 8.5),
        (13, 68, 8.5),
        (13, 52, 8.5),
        (30, -60, 8.5),
        (-30, -60, 8.5),
        (-13.345549, -40.361296, 8.5),
        (13.345549, -40.361296, 8.5),
        (-30.698797, -71.369828, 8.5),
        (-21.698797, -71.369828, 8.5),
        (-10.698797, -71.369828, 8.5),
        (-7.698797, -65.869828, 8.5),
        (-13.698797, -71.369828, 8.5),
        (-16.698797, -65.869828, 8.5),
        (-16.698797, -62.869828, 8.5),
        (-7.698797, -62.869828, 8.5),
        (6.301203, -62.869828, 8.5),
        (-2.698797, -62.869828, 8.5),
        (11.301203, -62.869828, 8.5),
        (20.301203, -71.369828, 8.5),
        (14.301203, -71.369828, 8.5),
        (6.301203, -71.369828, 8.5),
        (0.301203, -71.369828, 8.5),
        (17.301203, -71.369828, 8.5),
        (11.301203, -71.369828, 8.5),
        (-2.698797, -71.369828, 8.5),
        (3.301203, -71.369828, 8.5),
        (-30, 60, 8.5),
        (30, 60, 8.5),
    ]]
    fillet(f4_edges, radius=F4_R)

    # F5
    f5_edges = [f1.edges().sort_by_distance(p)[0] for p in [
        (20.301203, -62.869828, 8.5),
    ]]
    fillet(f5_edges, radius=F5_R)


solid = f1.part
